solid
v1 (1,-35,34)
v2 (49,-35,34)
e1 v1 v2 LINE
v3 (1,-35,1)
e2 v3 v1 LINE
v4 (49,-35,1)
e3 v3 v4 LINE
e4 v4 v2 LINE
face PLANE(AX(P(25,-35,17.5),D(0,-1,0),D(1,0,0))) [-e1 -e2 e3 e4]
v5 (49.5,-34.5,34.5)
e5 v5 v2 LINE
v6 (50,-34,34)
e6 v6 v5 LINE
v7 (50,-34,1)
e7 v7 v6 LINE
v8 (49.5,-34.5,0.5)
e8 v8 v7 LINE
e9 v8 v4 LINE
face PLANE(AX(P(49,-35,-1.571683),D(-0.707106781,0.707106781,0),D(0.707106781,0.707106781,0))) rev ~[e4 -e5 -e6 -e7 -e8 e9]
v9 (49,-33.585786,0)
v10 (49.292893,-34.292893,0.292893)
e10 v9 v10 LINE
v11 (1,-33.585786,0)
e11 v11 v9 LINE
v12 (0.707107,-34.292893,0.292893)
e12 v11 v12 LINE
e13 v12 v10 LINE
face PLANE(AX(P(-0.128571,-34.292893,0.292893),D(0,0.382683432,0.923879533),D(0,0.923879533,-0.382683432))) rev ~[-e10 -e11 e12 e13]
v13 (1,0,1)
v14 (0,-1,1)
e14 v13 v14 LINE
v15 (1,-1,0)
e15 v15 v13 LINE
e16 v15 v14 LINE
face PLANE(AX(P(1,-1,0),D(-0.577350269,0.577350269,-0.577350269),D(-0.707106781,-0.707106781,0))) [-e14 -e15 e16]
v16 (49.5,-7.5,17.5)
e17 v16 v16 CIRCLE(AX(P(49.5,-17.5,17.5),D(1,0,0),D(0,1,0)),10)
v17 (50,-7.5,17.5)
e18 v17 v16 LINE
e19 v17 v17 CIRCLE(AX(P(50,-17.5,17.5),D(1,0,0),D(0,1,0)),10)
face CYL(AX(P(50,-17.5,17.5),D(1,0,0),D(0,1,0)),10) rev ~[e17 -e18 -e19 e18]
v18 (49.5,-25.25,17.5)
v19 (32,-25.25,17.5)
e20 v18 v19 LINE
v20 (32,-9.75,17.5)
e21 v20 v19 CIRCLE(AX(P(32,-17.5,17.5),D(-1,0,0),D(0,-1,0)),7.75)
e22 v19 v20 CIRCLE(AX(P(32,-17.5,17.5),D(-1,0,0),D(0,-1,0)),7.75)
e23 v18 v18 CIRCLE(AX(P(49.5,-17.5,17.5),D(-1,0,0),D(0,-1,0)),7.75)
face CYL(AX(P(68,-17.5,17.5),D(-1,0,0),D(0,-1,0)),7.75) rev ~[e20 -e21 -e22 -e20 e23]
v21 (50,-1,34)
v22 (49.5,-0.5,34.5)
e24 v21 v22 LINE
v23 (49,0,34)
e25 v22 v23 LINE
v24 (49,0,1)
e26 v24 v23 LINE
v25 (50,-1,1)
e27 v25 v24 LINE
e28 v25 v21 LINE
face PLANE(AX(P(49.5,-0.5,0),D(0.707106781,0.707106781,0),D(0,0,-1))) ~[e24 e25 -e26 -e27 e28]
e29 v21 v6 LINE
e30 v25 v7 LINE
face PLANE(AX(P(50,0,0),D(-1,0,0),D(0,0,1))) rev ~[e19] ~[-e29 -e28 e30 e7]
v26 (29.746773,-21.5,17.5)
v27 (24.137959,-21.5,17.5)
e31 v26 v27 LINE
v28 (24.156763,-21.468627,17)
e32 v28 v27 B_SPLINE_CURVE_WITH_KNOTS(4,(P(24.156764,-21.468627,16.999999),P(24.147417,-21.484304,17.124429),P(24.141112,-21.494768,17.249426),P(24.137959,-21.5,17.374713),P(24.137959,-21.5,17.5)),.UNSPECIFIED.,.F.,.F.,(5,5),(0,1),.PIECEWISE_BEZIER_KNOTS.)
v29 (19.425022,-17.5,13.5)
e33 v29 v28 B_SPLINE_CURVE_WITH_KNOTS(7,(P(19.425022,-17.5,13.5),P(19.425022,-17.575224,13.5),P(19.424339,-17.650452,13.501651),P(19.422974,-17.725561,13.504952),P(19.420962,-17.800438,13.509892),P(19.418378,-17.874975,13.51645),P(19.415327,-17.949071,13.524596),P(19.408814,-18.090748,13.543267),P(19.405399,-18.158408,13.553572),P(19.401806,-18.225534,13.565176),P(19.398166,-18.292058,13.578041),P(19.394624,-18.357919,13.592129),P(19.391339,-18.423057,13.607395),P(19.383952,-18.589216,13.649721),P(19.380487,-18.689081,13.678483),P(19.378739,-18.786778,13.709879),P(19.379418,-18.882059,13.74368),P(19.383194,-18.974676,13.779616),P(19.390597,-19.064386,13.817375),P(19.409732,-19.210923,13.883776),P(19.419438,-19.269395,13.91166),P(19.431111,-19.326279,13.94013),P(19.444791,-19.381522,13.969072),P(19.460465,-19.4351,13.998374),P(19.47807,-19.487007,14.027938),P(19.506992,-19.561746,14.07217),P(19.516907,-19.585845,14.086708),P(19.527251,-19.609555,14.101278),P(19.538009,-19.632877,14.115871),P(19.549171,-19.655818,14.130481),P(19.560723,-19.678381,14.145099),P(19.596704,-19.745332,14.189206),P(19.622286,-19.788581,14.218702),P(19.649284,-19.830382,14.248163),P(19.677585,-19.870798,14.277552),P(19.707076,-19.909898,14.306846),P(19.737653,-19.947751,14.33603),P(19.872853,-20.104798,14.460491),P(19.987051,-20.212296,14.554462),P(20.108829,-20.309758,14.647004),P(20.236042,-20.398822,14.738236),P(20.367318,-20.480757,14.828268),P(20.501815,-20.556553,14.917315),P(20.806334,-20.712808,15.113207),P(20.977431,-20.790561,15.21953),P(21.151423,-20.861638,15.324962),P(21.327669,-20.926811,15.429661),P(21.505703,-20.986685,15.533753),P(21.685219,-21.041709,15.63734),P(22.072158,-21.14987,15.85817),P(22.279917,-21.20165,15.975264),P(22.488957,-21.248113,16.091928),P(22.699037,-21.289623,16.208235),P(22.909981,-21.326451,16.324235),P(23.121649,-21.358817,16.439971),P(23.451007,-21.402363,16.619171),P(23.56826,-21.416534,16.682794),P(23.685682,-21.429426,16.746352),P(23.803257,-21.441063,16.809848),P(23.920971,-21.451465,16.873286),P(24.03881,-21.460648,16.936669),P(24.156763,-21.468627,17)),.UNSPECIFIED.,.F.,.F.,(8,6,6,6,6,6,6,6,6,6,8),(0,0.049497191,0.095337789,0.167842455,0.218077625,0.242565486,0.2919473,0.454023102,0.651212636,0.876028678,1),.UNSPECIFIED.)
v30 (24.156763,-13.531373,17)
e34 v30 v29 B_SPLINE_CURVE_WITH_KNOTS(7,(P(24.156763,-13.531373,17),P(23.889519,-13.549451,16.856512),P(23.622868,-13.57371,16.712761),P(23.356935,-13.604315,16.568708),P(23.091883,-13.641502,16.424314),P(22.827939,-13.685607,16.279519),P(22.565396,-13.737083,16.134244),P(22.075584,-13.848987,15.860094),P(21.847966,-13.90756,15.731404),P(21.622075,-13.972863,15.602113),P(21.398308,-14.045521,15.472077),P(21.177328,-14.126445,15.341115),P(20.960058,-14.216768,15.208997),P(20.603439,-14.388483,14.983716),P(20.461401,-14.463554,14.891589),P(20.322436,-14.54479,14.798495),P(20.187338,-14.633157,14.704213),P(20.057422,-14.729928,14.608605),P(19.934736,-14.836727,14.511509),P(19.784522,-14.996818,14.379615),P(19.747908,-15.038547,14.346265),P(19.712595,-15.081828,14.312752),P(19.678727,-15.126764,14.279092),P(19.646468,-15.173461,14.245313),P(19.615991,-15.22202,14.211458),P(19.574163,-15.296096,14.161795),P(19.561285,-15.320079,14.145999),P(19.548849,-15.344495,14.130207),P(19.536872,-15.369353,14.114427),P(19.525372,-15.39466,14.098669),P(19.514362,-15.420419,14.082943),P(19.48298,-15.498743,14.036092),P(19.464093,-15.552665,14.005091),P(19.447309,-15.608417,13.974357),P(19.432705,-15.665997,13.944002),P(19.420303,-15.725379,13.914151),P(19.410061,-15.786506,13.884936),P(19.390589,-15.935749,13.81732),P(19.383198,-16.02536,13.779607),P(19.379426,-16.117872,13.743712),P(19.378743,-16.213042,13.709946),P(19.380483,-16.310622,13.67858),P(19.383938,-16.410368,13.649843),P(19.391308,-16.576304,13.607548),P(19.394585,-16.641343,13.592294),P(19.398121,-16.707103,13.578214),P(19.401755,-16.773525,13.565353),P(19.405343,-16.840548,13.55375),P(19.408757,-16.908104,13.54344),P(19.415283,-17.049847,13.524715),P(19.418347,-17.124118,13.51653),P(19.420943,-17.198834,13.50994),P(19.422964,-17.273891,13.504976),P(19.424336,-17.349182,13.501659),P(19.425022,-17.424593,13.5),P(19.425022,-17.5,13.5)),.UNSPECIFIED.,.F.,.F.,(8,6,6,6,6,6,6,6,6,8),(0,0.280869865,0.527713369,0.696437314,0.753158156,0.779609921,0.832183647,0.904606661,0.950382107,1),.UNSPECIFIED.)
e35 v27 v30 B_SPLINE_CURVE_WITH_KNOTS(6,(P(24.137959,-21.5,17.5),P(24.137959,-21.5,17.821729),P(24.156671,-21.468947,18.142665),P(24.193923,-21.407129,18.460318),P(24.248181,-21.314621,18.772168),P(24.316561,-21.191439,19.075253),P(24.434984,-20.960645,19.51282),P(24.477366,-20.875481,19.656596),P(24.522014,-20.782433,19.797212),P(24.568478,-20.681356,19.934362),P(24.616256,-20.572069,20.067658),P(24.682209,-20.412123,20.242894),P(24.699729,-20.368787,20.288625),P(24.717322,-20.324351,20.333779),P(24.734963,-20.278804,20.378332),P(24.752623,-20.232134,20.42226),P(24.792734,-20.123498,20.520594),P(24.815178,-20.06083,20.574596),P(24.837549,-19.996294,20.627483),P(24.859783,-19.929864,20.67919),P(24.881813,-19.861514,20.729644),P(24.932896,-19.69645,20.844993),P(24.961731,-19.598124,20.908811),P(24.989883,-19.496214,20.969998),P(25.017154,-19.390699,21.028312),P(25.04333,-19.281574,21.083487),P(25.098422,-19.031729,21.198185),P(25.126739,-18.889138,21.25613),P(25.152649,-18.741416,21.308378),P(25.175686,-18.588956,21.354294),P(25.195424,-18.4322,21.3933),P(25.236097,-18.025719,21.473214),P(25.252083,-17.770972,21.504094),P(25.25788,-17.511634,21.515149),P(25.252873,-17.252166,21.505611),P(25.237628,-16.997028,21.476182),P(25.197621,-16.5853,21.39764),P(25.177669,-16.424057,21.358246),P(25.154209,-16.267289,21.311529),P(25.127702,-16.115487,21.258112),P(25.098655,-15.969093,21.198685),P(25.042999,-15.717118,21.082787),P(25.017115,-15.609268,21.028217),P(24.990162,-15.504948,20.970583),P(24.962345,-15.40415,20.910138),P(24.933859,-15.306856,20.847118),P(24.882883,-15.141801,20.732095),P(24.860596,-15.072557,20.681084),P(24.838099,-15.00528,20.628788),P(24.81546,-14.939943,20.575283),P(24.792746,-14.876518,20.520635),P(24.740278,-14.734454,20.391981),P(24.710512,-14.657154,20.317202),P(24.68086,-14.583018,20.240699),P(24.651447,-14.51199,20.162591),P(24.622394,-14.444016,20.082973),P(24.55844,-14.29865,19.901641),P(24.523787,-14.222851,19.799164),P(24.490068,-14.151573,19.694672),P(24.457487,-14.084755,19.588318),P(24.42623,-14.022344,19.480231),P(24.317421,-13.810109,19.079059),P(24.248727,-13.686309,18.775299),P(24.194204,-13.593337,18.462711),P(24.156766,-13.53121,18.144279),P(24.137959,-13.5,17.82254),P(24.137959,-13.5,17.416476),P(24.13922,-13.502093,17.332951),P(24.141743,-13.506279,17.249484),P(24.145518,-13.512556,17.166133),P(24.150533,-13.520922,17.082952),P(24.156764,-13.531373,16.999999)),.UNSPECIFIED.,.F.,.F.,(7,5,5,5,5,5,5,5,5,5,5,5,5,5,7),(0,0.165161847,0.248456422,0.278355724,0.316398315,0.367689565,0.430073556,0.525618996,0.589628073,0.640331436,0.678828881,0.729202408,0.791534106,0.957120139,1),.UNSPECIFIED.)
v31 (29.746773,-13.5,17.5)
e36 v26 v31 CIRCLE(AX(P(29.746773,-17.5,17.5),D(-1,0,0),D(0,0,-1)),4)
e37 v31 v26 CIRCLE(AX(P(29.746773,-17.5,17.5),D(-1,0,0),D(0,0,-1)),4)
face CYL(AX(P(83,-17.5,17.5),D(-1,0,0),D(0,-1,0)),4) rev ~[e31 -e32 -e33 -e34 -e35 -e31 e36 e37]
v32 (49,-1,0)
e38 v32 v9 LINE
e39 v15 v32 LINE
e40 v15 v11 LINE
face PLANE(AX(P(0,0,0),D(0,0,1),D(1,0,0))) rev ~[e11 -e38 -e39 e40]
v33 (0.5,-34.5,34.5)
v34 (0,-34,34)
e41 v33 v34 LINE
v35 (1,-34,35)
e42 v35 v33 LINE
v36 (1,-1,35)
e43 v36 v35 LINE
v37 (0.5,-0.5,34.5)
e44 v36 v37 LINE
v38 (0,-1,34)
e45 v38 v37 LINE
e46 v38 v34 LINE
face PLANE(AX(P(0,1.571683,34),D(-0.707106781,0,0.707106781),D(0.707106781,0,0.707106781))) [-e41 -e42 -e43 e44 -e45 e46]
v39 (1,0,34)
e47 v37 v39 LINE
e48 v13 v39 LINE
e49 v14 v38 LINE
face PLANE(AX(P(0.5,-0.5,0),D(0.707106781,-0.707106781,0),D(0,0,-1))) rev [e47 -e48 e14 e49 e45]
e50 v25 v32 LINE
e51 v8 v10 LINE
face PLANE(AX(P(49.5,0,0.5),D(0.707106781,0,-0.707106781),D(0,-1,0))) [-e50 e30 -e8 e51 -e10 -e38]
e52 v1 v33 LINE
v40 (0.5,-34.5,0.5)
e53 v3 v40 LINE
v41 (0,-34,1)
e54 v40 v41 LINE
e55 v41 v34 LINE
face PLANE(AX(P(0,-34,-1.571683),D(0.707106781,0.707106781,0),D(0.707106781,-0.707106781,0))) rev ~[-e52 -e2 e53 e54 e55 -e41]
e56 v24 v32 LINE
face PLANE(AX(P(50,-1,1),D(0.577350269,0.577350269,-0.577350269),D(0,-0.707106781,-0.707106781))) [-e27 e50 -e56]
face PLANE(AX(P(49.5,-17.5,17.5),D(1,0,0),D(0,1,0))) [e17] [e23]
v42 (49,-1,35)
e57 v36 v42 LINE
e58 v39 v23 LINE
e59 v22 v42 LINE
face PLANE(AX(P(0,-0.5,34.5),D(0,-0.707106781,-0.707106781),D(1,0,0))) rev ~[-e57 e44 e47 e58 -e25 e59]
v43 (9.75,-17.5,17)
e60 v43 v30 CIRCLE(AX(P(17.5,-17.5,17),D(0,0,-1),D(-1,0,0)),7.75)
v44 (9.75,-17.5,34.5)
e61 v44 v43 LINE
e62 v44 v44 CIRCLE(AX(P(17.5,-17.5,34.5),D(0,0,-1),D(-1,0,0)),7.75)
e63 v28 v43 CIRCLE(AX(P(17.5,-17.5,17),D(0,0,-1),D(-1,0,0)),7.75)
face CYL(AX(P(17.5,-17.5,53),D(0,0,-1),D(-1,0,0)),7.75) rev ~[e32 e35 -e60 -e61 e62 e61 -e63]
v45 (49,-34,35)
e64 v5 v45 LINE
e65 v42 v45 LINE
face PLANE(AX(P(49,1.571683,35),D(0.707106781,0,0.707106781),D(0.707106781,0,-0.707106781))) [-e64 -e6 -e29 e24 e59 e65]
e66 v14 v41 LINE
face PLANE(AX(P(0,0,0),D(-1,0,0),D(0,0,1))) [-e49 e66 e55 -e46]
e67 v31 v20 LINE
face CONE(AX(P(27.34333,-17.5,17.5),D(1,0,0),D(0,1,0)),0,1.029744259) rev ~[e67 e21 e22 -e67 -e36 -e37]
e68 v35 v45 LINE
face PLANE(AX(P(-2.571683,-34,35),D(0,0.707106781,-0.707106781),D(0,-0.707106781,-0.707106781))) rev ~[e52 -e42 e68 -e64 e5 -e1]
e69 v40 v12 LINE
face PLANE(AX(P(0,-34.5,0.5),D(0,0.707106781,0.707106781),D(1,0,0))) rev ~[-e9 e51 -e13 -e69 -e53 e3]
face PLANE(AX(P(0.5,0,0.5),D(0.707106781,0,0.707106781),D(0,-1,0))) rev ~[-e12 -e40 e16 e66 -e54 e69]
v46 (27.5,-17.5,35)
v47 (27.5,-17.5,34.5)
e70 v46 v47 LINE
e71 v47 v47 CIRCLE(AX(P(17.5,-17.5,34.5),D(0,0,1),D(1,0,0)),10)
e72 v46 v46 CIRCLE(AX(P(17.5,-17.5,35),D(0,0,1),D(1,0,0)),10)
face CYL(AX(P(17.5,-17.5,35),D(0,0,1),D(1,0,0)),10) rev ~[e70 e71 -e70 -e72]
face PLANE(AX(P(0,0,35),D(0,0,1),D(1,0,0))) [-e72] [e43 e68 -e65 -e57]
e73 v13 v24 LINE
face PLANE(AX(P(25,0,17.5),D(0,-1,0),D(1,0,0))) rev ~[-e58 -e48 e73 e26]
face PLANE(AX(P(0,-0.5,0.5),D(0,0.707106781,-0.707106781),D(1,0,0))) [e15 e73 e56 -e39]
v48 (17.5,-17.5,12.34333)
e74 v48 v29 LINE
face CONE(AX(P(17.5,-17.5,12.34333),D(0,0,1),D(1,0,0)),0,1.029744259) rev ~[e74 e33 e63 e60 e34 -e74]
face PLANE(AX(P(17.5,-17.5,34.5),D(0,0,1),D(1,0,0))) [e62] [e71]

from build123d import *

# Parameters (mm, degrees)
F0_W         = 50
F0_H         = 35
F1_DEPTH     = 35
F3_D         = 15.5
F3_DEPTH     = 18
F3_TIP       = 4.6566697975
F5_D         = 15.5
F5_DEPTH     = 18
F5_TIP       = 4.6566697975
F7_D         = 8
F7_DEPTH     = 33
F7_TIP       = 2.4034424761
F8_R         = 10
F8_R_2       = 7.75
F9_DEPTH     = 0.5
F10_R        = 10
F10_R_2      = 7.75
F11_DEPTH    = 0.5
F13_SIZE     = 1
F14_T1_DEPTH = 39.1433659759
F14_T3_DEPTH = 39.1433659759
F14_T5_DEPTH = 55.1433659759
F14_T7_DEPTH = 50.2571417204


# Not quite as in the source:
# - a fillet or chamfer that OpenCascade refuses, or shapes differently, is made with other operations: its cross-section is extruded or revolved along the edge and cut away or added
# - a feature of the source that left no trace in its solid (it failed there, or was rolled back) is left out


with BuildPart() as f1:
    # F0 (on Front) → F1 (new body)
    with BuildSketch(Plane.XZ):
        with Locations((25, 17.5)):
            Rectangle(F0_W, F0_H)
    extrude(amount=F1_DEPTH)

    # F3
    with Locations(Plane.YZ.offset(50)):
        with Locations((-17.5, 17.5)):
            Hole(F3_D / 2, depth=F3_DEPTH)
            with Locations((0, 0, -(F3_DEPTH + F3_TIP / 2))):  # 118° drill point
                Cone(0, F3_D / 2, F3_TIP, mode=Mode.SUBTRACT)

    # F5
    with Locations(Plane.XY.offset(35)):
        with Locations((17.5, -17.5)):
            Hole(F5_D / 2, depth=F5_DEPTH)
            with Locations((0, 0, -(F5_DEPTH + F5_TIP / 2))):  # 118° drill point
                Cone(0, F5_D / 2, F5_TIP, mode=Mode.SUBTRACT)

    # F7
    with Locations(Plane.YZ.offset(50)):
        with Locations((-17.5, 17.5)):
            Hole(F7_D / 2, depth=F7_DEPTH)
            with Locations((0, 0, -(F7_DEPTH + F7_TIP / 2))):  # 118° drill point
                Cone(0, F7_D / 2, F7_TIP, mode=Mode.SUBTRACT)

    # F8 (on face) → F9 (cut)
    with BuildSketch(Plane.YZ.offset(50)):
        with Locations((-17.5, 17.5)):
            Circle(F8_R)
        with Locations((-17.5, 17.5)):
            Circle(F8_R_2, mode=Mode.SUBTRACT)
    extrude(amount=-F9_DEPTH, mode=Mode.SUBTRACT)

    # F10 (on face) → F11 (cut)
    with BuildSketch(Plane.XY.offset(35)):
        with Locations((17.5, -17.5)):
            Circle(F10_R)
        with Locations((17.5, -17.5)):
            Circle(F10_R_2, mode=Mode.SUBTRACT)
    extrude(amount=-F11_DEPTH, mode=Mode.SUBTRACT)

    # F13
    f13_edges = [f1.edges().sort_by_distance(p)[0] for p in [
        (0, 0, 17.5),
        (25, 0, 0),
        (50, 0, 17.5),
        (25, 0, 35),
        (0, -17.5, 0),
        (50, -17.5, 0),
        (25, -35, 0),
    ]]
    chamfer(f13_edges, length=F13_SIZE)

    # F14: chamfer of 1 on 6 edges, made by hand

    # F14_s2 → F14_t1 (cut)
    with BuildSketch(Plane.XZ.offset(-1.571682988)):
        Polygon((0, 34), (1, 35), (0, 35), align=None)
        Polygon((49, 35), (50, 34), (50, 35), align=None)
    extrude(amount=F14_T1_DEPTH, mode=Mode.SUBTRACT)

    # F14_s4 → F14_t3 (cut)
    with BuildSketch(Plane.XY.offset(-1.571682988)):
        Polygon((0, -34), (1, -35), (0, -35), align=None)
        Polygon((49, -35), (50, -34), (50, -35), align=None)
    extrude(amount=F14_T3_DEPTH, mode=Mode.SUBTRACT)

    # F14_s6 → F14_t5 (cut)
    with BuildSketch(Plane.YZ.offset(-2.571682988)):
        Polygon((-34, 35), (-35, 34), (-35, 35), align=None)
    extrude(amount=F14_T5_DEPTH, mode=Mode.SUBTRACT)

    # F14_s8 → F14_t7 (cut)
    with BuildSketch(Plane.YZ.offset(-0.1285708602)):
        Polygon((-34.2928932188, 0.2928932188), (-33.5857864376, 0), (-34, 0), align=None)
    extrude(amount=F14_T7_DEPTH, mode=Mode.SUBTRACT)


solid = f1.part
